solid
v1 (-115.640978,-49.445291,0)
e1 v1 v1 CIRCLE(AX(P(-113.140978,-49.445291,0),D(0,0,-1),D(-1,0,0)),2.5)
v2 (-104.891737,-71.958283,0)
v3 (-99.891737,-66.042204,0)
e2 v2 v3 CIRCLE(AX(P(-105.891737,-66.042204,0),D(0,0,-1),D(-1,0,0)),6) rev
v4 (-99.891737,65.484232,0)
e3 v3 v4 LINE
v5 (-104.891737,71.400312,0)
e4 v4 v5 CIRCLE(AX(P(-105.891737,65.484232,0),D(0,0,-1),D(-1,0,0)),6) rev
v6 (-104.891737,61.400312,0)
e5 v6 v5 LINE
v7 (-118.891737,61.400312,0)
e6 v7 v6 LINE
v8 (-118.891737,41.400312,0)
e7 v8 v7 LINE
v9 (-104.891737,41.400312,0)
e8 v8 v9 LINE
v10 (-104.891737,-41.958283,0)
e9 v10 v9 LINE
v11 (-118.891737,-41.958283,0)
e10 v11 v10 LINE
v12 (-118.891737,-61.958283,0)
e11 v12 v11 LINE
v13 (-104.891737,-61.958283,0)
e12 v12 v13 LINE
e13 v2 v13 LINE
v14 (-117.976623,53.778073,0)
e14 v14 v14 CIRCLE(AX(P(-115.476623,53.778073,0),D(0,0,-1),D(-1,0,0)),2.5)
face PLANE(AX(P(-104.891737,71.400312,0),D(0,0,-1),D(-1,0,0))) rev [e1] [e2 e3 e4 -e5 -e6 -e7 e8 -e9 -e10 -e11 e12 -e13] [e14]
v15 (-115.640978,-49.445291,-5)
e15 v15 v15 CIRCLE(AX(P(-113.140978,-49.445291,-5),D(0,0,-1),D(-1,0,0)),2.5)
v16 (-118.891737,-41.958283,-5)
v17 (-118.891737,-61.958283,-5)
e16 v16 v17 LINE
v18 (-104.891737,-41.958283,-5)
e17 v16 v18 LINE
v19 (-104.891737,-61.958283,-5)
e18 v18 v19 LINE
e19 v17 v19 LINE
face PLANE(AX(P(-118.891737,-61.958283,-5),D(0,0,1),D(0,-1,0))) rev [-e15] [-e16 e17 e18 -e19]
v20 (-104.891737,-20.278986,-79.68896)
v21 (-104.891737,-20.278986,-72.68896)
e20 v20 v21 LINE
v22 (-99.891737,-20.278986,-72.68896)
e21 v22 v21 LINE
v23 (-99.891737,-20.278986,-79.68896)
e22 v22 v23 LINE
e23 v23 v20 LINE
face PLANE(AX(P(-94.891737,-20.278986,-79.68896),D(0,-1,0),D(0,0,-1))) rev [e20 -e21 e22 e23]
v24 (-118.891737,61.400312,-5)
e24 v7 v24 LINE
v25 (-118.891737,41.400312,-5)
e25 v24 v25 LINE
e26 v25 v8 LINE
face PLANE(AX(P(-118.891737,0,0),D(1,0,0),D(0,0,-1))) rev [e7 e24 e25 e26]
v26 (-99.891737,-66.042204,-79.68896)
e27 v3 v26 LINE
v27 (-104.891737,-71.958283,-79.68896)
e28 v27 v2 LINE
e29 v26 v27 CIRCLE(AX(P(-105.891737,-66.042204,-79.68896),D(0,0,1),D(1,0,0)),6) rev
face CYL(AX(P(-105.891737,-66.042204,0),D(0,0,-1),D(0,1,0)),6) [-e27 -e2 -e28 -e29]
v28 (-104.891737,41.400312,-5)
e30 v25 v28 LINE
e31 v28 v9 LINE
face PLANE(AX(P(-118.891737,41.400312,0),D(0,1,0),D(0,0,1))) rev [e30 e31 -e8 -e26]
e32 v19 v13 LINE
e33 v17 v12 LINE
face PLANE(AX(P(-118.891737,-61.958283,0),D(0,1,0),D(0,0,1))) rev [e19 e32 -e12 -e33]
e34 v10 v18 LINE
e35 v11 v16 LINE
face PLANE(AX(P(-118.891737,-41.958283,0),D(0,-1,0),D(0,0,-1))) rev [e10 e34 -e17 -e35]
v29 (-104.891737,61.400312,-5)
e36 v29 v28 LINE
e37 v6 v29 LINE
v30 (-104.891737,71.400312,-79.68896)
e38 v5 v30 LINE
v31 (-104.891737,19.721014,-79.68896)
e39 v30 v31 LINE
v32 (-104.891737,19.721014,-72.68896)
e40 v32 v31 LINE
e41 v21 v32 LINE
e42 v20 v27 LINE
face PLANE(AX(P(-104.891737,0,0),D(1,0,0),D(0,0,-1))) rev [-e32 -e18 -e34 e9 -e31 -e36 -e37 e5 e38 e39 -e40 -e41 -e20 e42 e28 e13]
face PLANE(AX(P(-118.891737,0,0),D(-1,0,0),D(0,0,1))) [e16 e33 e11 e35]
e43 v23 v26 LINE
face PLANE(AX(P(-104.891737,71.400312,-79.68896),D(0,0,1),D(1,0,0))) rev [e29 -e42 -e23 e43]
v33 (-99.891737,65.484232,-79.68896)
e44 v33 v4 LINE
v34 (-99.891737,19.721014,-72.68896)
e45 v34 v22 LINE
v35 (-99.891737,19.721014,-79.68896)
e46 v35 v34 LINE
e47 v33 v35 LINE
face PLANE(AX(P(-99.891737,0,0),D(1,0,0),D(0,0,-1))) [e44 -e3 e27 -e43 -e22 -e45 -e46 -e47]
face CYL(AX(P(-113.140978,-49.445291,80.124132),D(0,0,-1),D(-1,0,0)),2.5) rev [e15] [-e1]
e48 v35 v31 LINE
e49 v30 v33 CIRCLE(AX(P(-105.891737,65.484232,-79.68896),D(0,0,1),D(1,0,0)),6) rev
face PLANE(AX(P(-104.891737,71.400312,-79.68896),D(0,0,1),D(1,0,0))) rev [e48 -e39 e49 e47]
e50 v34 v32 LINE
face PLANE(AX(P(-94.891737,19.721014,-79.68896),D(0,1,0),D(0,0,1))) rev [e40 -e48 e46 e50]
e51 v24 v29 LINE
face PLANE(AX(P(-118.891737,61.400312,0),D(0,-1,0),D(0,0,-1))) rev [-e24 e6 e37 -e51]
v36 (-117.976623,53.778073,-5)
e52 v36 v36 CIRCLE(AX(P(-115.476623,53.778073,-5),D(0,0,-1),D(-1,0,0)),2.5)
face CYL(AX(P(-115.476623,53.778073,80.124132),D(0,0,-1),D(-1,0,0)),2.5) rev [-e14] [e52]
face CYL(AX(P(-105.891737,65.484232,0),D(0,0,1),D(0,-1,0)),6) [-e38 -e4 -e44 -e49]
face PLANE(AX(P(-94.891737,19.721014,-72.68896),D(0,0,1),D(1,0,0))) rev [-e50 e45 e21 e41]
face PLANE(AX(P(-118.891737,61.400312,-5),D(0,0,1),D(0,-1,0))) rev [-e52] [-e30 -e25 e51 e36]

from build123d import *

# Parameters (mm, degrees)
CROQUIS2_W              = 200
CROQUIS2_H              = 150
CROQUIS2_R              = 2
CROQUIS2_R_2            = 2.5
CROQUIS2_W_2            = 31.297292299
CROQUIS2_H_2            = 43.768728426
CROQUIS2_H_3            = 43.768728427
CROQUIS2_W_3            = 23.573907934
CROQUIS2_H_4            = 45.323962431
SALIENTE_EXTRUIR1_DEPTH = 2
REDONDEO1_R             = 10
BOSS_EXTRUDE1_DEPTH     = 25
SKETCH3_W               = 62.040442094
SKETCH3_H               = 5.530821024
BOSS_EXTRUDE2_DEPTH     = 22
SKETCH8_W               = 62.040442094
SKETCH8_H               = 5.530821024
BOSS_EXTRUDE6_DEPTH     = 13
SKETCH2_W               = 200
SKETCH2_H               = 78.124132015
SKETCH2_W_2             = 62.040442094
SKETCH2_H_2             = 5.530821024
BOSS_EXTRUDE3_DEPTH     = 5
SKETCH4_W               = 62.040442094
SKETCH4_H               = 5.530821024
BOSS_EXTRUDE4_DEPTH     = 19
SKETCH5_W               = 7.442573222
SKETCH5_H               = 2.991451355
BOSS_EXTRUDE5_DEPTH     = 21
SKETCH6_R               = 2.5
CUT_EXTRUDE1_DEPTH      = 158.961544101
FILLET1_R               = 10
SKETCH10_W              = 79.68896036
SKETCH10_H              = 143.358595358
BOSS_EXTRUDE7_DEPTH     = 5
SKETCH11_W              = 5
SKETCH11_H              = 20
BOSS_EXTRUDE13_DEPTH    = 14
SKETCH12_R              = 2.5
CUT_EXTRUDE2_DEPTH      = 176.118897221
FILLET2_R               = 6
CUT_EXTRUDE3_DEPTH      = 222.270727407
SKETCH14_W              = 12
SKETCH14_H              = 2
CUT_EXTRUDE4_DEPTH      = 198.082327879
SKETCH15_W              = 7
SKETCH15_H              = 40
CUT_EXTRUDE5_DEPTH      = 10


with BuildPart() as part:
    # Croquis2 → Saliente-Extruir1 (new body)
    with BuildSketch(Plane.XY):
        with Locations((0.108263467, -0.36008145)):
            Rectangle(CROQUIS2_W, CROQUIS2_H)
        with Locations((89.108263467, -66.5)):
            Circle(CROQUIS2_R, mode=Mode.SUBTRACT)
        with Locations((-88.891736533, -66.5)):
            Circle(CROQUIS2_R, mode=Mode.SUBTRACT)
        with Locations(Location((89.108263467, 65.779837101, 0), (0, 0, 180))):
            Circle(CROQUIS2_R, mode=Mode.SUBTRACT)
        with Locations(Location((-88.891736533, 65.779837101, 0), (0, 0, 180))):
            Circle(CROQUIS2_R, mode=Mode.SUBTRACT)
        with Locations((-80.865436179, -59.36008145)):
            Circle(CROQUIS2_R_2, mode=Mode.SUBTRACT)
        with Locations((81.108263467, -59.36008145)):
            Circle(CROQUIS2_R_2, mode=Mode.SUBTRACT)
        with Locations(Location((81.108263467, 58.63991855, 0), (0, 0, 180))):
            Circle(CROQUIS2_R_2, mode=Mode.SUBTRACT)
        with Locations(Location((-80.865436179, 58.63991855, 0), (0, 0, 180))):
            Circle(CROQUIS2_R_2, mode=Mode.SUBTRACT)
        with BuildLine():
            Line((-62.091736533, 70.63991855), (64.108263467, 70.63991855))
            ThreePointArc((64.108263467, 70.63991855), (66.108263467, 68.63991855), (64.108263467, 66.63991855))
            Line((64.108263467, 66.63991855), (-62.091736533, 66.63991855))
            ThreePointArc((-62.091736533, 66.63991855), (-64.091736533, 68.63991855), (-62.091736533, 70.63991855))
        make_face(mode=Mode.SUBTRACT)
        Polygon((-71.391736533, -12.902447307), (-71.391736533, 12.182284408), (-79.241736533, 12.28991855), (-83.891736533, 12.28991855), (-83.891736533, -13.01008145), (-79.241736533, -13.01008145), align=None, mode=Mode.SUBTRACT)
        with BuildLine():
            Line((92.108263467, 45.478381757), (92.108263467, -46.198544657))
            ThreePointArc((92.108263467, -46.198544657), (90.807295546, -47.897576736), (89.108263467, -46.596608814))
            Line((89.108263467, -46.596608814), (89.108263467, 45.876445915))
            ThreePointArc((89.108263467, 45.876445915), (90.807295546, 47.177413836), (92.108263467, 45.478381757))
        make_face(mode=Mode.SUBTRACT)
        Polygon((84.108263467, 12.28991855), (84.108263467, -13.01008145), (79.458263467, -13.01008145), (71.608263467, -13.01008145), (71.608263467, 12.28991855), (79.458263467, 12.28991855), align=None, mode=Mode.SUBTRACT)
        with BuildLine():
            Line((-91.891736533, 45.478381757), (-91.891736533, -46.198544657))
            ThreePointArc((-91.891736533, -46.198544657), (-90.590768612, -47.897576736), (-88.891736533, -46.596608814))
            Line((-88.891736533, -46.596608814), (-88.891736533, 45.876445915))
            ThreePointArc((-88.891736533, 45.876445915), (-90.590768612, 47.177413836), (-91.891736533, 45.478381757))
        make_face(mode=Mode.SUBTRACT)
        with Locations((-30.011405388, 36.299005811)):
            Rectangle(CROQUIS2_W_2, CROQUIS2_H_2, mode=Mode.SUBTRACT)
        with BuildLine():
            Line((-62.091736533, -71.36008145), (64.108263467, -71.36008145))
            ThreePointArc((64.108263467, -71.36008145), (66.108263467, -69.36008145), (64.108263467, -67.36008145))
            Line((64.108263467, -67.36008145), (-62.091736533, -67.36008145))
            ThreePointArc((-62.091736533, -67.36008145), (-64.091736533, -69.36008145), (-62.091736533, -71.36008145))
        make_face(mode=Mode.SUBTRACT)
        with Locations((-30.011405388, -26.799059535)):
            Rectangle(CROQUIS2_W_2, CROQUIS2_H_3, mode=Mode.SUBTRACT)
        with Locations((12.982877294, -0.693345879)):
            Rectangle(CROQUIS2_W_3, CROQUIS2_H_4, mode=Mode.SUBTRACT)
    extrude(amount=SALIENTE_EXTRUIR1_DEPTH)

    # Redondeo1
    redondeo1_edges = [part.edges().sort_by_distance(p)[0] for p in [
        (100.108263467, -75.36008145, 1),
        (-99.891736533, -75.36008145, 1),
        (-99.891736533, 74.63991855, 1),
        (100.108263467, 74.63991855, 1),
    ]]
    fillet(redondeo1_edges, radius=REDONDEO1_R)

    # Sketch1 → Boss-Extrude1 (add)
    with BuildSketch(Plane.XY.offset(2)):
        Polygon((-67.071845217, 64.63991855), (-67.071845217, 60.63991855), (-8.841198185, 60.63991855), (-8.841198185, 3.63991855), (-67.071845217, 3.63991855), (-67.071845217, -0.36008145), (-8.841198185, -0.36008145), (-8.841198185, -53.36008145), (-67.071845217, -53.36008145), (-67.071845217, -57.574734434), (-5.031403123, -57.574734434), (-5.031403123, -40.931443482), (46.608263467, -40.931443482), (46.608263467, -36.931443482), (-5.031403123, -36.931443482), (-5.031403123, 30.068556518), (46.608263467, 30.068556518), (46.608263467, 34.068556518), (-5.031403123, 34.068556518), (-5.031403123, 64.63991855), align=None)
    extrude(amount=BOSS_EXTRUDE1_DEPTH)

    # Sketch3 → Boss-Extrude2 (add)
    with BuildSketch(Plane.XZ.offset(57.574734434)):
        with Locations((-36.05162417, 24.234589488)):
            Rectangle(SKETCH3_W, SKETCH3_H)
    extrude(amount=BOSS_EXTRUDE2_DEPTH)

    # Sketch8 → Boss-Extrude6 (add)
    with BuildSketch(Plane(origin=(0, 64.63991855, 0), x_dir=(1, 0, 0), z_dir=(0, 1, 0))):
        with Locations((-36.05162417, -24.234589488)):
            Rectangle(SKETCH8_W, SKETCH8_H)
    extrude(amount=BOSS_EXTRUDE6_DEPTH)

    # Sketch2 → Boss-Extrude3 (add)
    with BuildSketch(Plane.XZ.offset(75.36008145)):
        with Locations((0.108263467, 41.062066008)):
            Rectangle(SKETCH2_W, SKETCH2_H)
        with Locations((-36.05162417, 24.234589488)):
            Rectangle(SKETCH2_W_2, SKETCH2_H_2, mode=Mode.SUBTRACT)
    extrude(amount=-BOSS_EXTRUDE3_DEPTH)

    # Sketch4 → Boss-Extrude4 (add)
    with BuildSketch(Plane(origin=(0, 64.63991855, 0), x_dir=(1, 0, 0), z_dir=(0, 1, 0))):
        with Locations((-36.05162417, -24.234589488)):
            Rectangle(SKETCH4_W, SKETCH4_H)
    extrude(amount=BOSS_EXTRUDE4_DEPTH)

    # Sketch5 → Boss-Extrude5 (add)
    with BuildSketch(Plane.XZ.offset(75.36008145)):
        with Locations((-80.540187187, 3.495725678)):
            Rectangle(SKETCH5_W, SKETCH5_H)
        with Locations((80.756714122, 3.495725678)):
            Rectangle(SKETCH5_W, SKETCH5_H)
    extrude(amount=BOSS_EXTRUDE5_DEPTH)

    # Sketch6 → Cut-Extrude1 (cut, through all)
    with BuildSketch(Plane.XY.offset(4.991451355)):
        with Locations((-80.996023003, -59.284349751)):
            Circle(SKETCH6_R)
        with Locations((81.166025964, -59.051385225)):
            Circle(SKETCH6_R)
    extrude(amount=-CUT_EXTRUDE1_DEPTH, mode=Mode.SUBTRACT)

    # Fillet1
    # the kernel refuses this fillet: 10 mm, written as the material it takes off along each edge
    with BuildSketch(Plane(origin=(100.108263467, -70.36008145, 2), x_dir=(-1, 0, 0), z_dir=(0, 0, 1)), Plane(origin=(-99.891736533, -70.36008145, 101.77476711), x_dir=(1, 0, 0), z_dir=(0, 0, -1))) as fillet1_piece_1:
        with BuildLine():
            CenterArc((8.660254038, 10), FILLET1_R, 210, 60)
            Line((0, 5), (0, 0))
            Line((0, 0), (8.660254038, 0))
        make_face()
    extrude(amount=99.77476711, mode=Mode.SUBTRACT)


with BuildPart() as body_2:
    # Sketch10 → Boss-Extrude7 (new body)
    with BuildSketch(Plane.ZY.offset(99.891736533)):
        with Locations((-39.84448018, -0.278985798)):
            Rectangle(SKETCH10_W, SKETCH10_H)
    extrude(amount=BOSS_EXTRUDE7_DEPTH)

    # Sketch11 → Boss-Extrude13 (add)
    with BuildSketch(Plane.ZY.offset(104.891736533)):
        with Locations((-2.5, -51.958283477)):
            Rectangle(SKETCH11_W, SKETCH11_H)
        with Locations((-2.5, 51.400311881)):
            Rectangle(SKETCH11_W, SKETCH11_H)
    extrude(amount=BOSS_EXTRUDE13_DEPTH)


with BuildPart() as cut_extrude2_tool:
    # Sketch12 → Cut-Extrude2 (new, through all)
    with BuildSketch(Plane(origin=(0, 0, -5), x_dir=(-1, 0, 0), z_dir=(0, 0, -1))):
        with Locations((94.306850379, -54.336044589)):
            Circle(SKETCH12_R)
        with Locations((94.306850379, 53.778072993)):
            Circle(SKETCH12_R)
        with Locations((115.476622686, 53.778072993)):
            Circle(SKETCH12_R)
        with Locations((113.140977594, -49.445291065)):
            Circle(SKETCH12_R)
    extrude(amount=-CUT_EXTRUDE2_DEPTH)


with BuildPart() as part_1:
    add(part.part)

    # Cut-Extrude2: cut by cut_extrude2_tool
    add(cut_extrude2_tool.part, mode=Mode.SUBTRACT)

    # Sketch13 → Cut-Extrude3 (cut, through all)
    with BuildSketch(Plane.XY.offset(80.124132015)):
        Polygon((-88.891736533, 41.400311881), (-87.891736533, 41.400311881), (-87.891736533, 63.52554782), (-99.891736533, 63.52554782), (-99.891736533, 94.010082764), (108.48763668, 94.010082764), (108.48763668, -102.123784964), (-99.891736533, -102.123784964), (-99.891736533, -61.922986139), (-88.478309969, -61.922986139), (-88.478309969, -40.956005085), (-99.891736533, -40.956005085), (-99.891736533, 41.400311881), align=None)
    extrude(amount=-CUT_EXTRUDE3_DEPTH, mode=Mode.SUBTRACT)


with BuildPart() as body_2_1:
    add(body_2.part)

    # Cut-Extrude2: cut by cut_extrude2_tool
    add(cut_extrude2_tool.part, mode=Mode.SUBTRACT)

    # Fillet2
    # the kernel refuses this fillet: 6 mm, written as the material it takes off along each edge
    with BuildSketch(Plane(origin=(-99.891736533, -71.958283477, -94.479159818), x_dir=(0, 1, 0), z_dir=(0, 0, 1))) as fillet2_piece_1:
        with BuildLine():
            CenterArc((5.916079783, 6), FILLET2_R, 189.594068227, 80.405931773)
            Line((0, 5), (-0.118321596, 4.98))
            ThreePointArc((-0.118321596, 4.98), (-0.12, 2.5), (-0.12, 0))
            Line((-0.12, 0), (0, -0.12))
            Line((0, -0.12), (5.916079783, -0.12))
            Line((5.916079783, -0.12), (5.916079783, 0))
        make_face()
    extrude(amount=109.269359275, mode=Mode.SUBTRACT)
    with BuildSketch(Plane(origin=(-99.891736533, 71.400311881, 14.790199458), x_dir=(-1, 0, 0), z_dir=(0, 0, -1))) as fillet2_piece_2:
        with BuildLine():
            CenterArc((6, -5.916079783), FILLET2_R, 99.594068227, 80.405931773)
            Line((0, -5.916079783), (-0.12, -5.916079783))
            Line((-0.12, -5.916079783), (-0.12, 0))
            Line((-0.12, 0), (0, 0.12))
            ThreePointArc((0, 0.12), (2.5, 0.12), (4.98, 0.118321596))
            Line((4.98, 0.118321596), (5, 0))
        make_face()
    extrude(amount=109.269359275, mode=Mode.SUBTRACT)

    # Sketch15 → Cut-Extrude5 (cut)
    with BuildSketch(Plane.ZY.offset(104.891736533)):
        with Locations((-76.18896036, -0.278985798)):
            Rectangle(SKETCH15_W, SKETCH15_H)
    extrude(amount=-CUT_EXTRUDE5_DEPTH, mode=Mode.SUBTRACT)


with BuildPart() as cut_extrude3_piece_1:
    # of the separate pieces the step leaves, piece 1, a body of its own (cut_extrude3_pieces)
    add(part_1.part.solids().sort_by_distance((-99.891736533, 63.52554782, 0))[0])


with BuildPart() as cut_extrude3_piece_2:
    # of the separate pieces the step leaves, piece 2, a body of its own (cut_extrude3_pieces)
    add(part_1.part.solids().sort_by_distance((-99.891736533, -40.956005085, 0))[0])


with BuildPart() as cut_extrude4_tool:
    # Sketch14 → Cut-Extrude4 (new, through all)
    with BuildSketch(Plane(origin=(0, 63.52554782, 0), x_dir=(1, 0, 0), z_dir=(0, 1, 0))):
        with Locations((-93.891736533, -1)):
            Rectangle(SKETCH14_W, SKETCH14_H)
    extrude(amount=-CUT_EXTRUDE4_DEPTH)


with BuildPart() as cut_extrude3_piece_1_1:
    add(cut_extrude3_piece_1.part)

    # Cut-Extrude4: cut by cut_extrude4_tool
    add(cut_extrude4_tool.part, mode=Mode.SUBTRACT)


with BuildPart() as cut_extrude3_piece_2_1:
    add(cut_extrude3_piece_2.part)

    # Cut-Extrude4: cut by cut_extrude4_tool
    add(cut_extrude4_tool.part, mode=Mode.SUBTRACT)


solid = body_2_1.part
